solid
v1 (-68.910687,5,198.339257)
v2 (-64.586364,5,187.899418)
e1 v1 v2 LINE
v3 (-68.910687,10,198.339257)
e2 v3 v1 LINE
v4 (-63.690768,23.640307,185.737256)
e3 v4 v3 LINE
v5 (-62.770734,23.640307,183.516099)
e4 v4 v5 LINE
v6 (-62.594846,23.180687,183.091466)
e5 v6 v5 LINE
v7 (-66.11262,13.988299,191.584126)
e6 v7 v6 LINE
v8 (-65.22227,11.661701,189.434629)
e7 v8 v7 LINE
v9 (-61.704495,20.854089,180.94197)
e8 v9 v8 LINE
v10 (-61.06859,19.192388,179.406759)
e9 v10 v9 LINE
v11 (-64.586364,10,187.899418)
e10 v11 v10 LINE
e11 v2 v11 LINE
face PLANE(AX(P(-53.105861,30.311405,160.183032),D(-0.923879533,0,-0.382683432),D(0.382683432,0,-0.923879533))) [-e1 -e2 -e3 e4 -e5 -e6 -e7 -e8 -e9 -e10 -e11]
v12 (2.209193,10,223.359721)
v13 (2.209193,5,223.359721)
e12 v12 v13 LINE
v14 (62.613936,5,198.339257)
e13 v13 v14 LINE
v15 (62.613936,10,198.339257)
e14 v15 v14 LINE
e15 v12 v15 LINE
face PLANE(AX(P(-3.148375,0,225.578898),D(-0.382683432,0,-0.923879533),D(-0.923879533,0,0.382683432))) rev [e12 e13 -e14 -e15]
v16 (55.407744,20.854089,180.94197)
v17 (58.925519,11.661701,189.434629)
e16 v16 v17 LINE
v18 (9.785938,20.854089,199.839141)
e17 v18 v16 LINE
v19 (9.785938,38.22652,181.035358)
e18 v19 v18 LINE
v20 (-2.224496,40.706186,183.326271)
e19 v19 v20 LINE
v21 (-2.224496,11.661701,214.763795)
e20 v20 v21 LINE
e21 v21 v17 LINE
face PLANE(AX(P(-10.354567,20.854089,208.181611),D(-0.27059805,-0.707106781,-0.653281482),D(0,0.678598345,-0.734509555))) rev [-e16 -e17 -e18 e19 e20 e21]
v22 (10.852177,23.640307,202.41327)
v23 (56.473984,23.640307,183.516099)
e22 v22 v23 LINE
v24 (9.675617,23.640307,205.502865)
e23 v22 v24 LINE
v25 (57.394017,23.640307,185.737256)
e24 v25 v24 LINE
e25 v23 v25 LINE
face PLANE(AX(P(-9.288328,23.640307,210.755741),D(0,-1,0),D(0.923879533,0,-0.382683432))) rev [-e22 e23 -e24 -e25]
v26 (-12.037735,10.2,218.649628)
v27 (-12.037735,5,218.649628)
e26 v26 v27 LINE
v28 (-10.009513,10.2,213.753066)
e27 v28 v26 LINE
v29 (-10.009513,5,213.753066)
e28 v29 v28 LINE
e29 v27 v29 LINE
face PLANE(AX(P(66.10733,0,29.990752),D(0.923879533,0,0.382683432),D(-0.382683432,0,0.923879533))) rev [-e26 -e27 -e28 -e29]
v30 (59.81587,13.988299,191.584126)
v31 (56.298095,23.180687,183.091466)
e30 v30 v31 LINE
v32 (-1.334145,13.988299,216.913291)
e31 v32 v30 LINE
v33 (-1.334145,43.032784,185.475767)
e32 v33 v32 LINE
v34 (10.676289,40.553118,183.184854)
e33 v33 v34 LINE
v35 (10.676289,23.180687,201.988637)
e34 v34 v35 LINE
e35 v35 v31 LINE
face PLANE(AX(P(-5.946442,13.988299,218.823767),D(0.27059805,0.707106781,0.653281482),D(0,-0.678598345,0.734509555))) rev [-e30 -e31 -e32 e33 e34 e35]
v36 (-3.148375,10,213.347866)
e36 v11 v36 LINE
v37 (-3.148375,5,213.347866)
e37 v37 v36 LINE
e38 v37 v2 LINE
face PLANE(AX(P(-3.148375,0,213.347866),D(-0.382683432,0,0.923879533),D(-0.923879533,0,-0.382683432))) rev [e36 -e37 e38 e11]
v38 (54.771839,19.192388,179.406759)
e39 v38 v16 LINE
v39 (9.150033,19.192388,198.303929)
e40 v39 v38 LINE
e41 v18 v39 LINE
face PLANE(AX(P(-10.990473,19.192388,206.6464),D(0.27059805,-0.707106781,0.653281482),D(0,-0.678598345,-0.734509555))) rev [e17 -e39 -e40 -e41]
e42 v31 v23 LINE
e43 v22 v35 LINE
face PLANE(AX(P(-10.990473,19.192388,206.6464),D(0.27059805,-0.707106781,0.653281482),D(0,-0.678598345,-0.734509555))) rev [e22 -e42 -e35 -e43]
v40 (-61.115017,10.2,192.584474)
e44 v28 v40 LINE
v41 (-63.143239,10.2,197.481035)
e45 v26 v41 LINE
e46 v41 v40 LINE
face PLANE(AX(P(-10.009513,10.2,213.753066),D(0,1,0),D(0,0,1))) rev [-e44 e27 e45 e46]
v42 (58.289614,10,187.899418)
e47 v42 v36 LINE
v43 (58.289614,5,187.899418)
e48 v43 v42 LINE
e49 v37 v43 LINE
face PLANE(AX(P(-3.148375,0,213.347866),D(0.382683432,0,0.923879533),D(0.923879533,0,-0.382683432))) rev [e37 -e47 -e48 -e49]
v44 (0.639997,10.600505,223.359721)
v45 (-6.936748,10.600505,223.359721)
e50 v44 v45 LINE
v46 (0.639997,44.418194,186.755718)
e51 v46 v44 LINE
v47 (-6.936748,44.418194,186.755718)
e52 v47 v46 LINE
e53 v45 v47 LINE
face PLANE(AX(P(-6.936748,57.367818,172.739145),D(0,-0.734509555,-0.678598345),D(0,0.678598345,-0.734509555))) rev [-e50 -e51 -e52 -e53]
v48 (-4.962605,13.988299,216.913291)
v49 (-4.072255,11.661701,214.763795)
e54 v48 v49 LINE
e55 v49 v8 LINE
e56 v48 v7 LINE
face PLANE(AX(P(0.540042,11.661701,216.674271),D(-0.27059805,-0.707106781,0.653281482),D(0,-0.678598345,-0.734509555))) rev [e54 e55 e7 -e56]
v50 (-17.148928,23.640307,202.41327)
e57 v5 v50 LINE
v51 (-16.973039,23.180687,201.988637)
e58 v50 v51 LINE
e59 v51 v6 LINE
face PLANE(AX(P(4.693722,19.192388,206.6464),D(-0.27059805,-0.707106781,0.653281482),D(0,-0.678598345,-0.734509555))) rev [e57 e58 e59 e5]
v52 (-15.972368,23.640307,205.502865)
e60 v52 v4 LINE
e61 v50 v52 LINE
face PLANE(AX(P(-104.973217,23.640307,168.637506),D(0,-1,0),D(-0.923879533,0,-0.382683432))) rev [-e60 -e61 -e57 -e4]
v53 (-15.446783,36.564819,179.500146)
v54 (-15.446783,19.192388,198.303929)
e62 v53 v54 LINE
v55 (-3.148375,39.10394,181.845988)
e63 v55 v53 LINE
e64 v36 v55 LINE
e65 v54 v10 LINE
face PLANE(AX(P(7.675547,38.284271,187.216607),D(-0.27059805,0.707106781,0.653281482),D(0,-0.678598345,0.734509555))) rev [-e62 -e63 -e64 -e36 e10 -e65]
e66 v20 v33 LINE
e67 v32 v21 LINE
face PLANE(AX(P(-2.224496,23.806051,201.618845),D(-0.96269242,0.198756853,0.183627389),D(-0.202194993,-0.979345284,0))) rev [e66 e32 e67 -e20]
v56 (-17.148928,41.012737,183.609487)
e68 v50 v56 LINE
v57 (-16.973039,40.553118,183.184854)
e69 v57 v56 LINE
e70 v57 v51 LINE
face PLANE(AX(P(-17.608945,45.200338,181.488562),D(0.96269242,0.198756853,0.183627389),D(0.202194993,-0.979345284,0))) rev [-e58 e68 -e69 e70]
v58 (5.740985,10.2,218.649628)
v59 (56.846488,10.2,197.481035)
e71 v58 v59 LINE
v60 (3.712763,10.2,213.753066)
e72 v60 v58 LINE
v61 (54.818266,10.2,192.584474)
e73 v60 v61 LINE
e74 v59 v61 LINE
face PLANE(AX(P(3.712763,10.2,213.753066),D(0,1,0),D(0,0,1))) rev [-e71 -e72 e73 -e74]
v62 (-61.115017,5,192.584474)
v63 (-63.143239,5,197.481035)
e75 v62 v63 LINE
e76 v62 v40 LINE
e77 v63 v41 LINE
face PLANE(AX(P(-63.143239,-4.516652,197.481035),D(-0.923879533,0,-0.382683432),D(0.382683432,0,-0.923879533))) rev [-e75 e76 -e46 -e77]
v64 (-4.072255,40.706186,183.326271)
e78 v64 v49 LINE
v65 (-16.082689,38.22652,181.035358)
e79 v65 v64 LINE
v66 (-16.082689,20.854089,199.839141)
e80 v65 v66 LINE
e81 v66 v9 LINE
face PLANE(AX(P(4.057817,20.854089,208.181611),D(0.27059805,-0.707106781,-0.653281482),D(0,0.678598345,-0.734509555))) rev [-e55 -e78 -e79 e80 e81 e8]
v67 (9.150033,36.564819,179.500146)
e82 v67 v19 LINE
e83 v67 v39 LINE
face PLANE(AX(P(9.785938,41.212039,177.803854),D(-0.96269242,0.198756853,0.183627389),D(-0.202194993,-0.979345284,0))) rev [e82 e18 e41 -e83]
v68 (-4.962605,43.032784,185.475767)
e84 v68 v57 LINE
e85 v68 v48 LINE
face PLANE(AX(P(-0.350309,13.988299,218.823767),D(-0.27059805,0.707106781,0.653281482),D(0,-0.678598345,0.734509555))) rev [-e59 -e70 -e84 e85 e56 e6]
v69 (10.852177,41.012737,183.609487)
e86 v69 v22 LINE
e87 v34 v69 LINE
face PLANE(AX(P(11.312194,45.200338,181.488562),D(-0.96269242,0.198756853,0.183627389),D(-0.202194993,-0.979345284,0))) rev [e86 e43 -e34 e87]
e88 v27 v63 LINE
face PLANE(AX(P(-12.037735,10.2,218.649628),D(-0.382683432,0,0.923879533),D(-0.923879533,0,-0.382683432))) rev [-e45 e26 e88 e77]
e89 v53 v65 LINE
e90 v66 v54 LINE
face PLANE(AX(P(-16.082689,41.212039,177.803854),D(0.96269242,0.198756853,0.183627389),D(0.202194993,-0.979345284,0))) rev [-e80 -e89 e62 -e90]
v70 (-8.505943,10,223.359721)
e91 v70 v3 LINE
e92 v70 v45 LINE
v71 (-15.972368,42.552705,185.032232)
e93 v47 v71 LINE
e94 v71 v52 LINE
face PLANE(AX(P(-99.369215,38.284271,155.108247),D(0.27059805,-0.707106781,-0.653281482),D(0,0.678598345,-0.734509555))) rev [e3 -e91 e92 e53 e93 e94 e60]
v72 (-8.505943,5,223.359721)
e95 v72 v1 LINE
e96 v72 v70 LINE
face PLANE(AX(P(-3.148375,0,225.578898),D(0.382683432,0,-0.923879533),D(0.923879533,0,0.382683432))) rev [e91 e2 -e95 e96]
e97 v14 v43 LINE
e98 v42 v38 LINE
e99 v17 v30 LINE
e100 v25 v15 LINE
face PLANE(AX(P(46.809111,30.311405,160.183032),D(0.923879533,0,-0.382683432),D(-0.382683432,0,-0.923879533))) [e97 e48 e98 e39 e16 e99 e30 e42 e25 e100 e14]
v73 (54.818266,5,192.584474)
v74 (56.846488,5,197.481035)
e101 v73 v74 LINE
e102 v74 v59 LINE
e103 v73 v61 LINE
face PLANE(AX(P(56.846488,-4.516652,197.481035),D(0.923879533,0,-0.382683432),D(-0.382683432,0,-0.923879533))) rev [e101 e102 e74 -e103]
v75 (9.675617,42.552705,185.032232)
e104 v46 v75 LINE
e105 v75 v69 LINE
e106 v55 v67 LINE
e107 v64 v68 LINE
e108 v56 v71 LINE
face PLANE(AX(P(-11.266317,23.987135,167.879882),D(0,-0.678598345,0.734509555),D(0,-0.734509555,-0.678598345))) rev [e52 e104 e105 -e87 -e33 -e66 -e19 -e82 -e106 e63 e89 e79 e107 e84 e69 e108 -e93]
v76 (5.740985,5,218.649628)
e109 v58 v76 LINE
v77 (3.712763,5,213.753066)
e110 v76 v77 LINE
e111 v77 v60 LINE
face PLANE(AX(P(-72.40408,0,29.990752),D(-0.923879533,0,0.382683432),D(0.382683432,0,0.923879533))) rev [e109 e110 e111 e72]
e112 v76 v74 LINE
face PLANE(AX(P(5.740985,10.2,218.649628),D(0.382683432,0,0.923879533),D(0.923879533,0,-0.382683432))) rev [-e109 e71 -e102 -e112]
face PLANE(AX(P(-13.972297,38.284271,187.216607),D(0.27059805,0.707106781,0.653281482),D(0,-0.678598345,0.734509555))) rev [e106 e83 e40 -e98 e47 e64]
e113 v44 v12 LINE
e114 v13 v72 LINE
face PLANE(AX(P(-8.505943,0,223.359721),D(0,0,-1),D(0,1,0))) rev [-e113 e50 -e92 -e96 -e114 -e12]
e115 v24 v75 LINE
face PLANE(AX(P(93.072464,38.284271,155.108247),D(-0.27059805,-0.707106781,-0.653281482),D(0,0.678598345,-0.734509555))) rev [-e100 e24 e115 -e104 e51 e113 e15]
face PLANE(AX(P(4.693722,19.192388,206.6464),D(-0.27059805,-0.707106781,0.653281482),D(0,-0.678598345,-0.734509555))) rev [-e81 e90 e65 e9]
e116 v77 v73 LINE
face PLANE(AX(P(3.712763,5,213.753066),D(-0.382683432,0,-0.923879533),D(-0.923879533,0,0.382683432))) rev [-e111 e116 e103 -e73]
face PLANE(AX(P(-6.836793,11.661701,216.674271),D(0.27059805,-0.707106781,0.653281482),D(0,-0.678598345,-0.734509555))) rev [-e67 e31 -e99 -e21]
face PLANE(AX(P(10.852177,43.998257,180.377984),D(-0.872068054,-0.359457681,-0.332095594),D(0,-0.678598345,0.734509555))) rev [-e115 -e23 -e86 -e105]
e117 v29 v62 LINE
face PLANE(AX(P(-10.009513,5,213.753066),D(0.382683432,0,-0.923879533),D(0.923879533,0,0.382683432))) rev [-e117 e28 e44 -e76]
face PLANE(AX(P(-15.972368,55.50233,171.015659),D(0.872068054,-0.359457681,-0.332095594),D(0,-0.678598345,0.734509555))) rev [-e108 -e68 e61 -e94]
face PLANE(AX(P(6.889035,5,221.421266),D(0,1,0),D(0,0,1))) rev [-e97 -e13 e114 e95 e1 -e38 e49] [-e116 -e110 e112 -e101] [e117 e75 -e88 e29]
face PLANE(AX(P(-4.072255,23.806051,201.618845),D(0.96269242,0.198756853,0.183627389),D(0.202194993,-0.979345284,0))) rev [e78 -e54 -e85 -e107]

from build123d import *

# Parameters (mm, degrees)
SKETCH1_W                = 214.0895226738578
SKETCH1_H                = 271.0335668448457
BOSS_EXTRUDE1_DEPTH      = 10
SKETCH3_W                = 107.0447613369289
SKETCH3_H                = 271.0335668448457
CUT_EXTRUDE1_DEPTH       = 252.25359017903727
CUT_EXTRUDE2_DEPTH       = 249.55642867000518
BOSS_EXTRUDE3_DEPTH      = 40
CUT_EXTRUDE3_START       = -165.689856025
CUT_EXTRUDE3_DEPTH       = 205.862728092
CUT_EXTRUDE4_DEPTH       = 250.9605933606232
CUT_EXTRUDE5_DEPTH       = 250.96059336062322
BOSS_EXTRUDE5_DEPTH      = 45.000000000000014
CUT_EXTRUDE7_DEPTH       = 253.78419033582136
CUT_EXTRUDE9_DEPTH       = 253.78419033582136
CUT_EXTRUDE10_DEPTH      = 105
BOSS_EXTRUDE6_DEPTH      = 13.546139965279659
BOSS_EXTRUDE7_DEPTH      = 30
CUT_EXTRUDE12_DEPTH      = 30
CUT_EXTRUDE13_DEPTH      = 30
CUT_EXTRUDE14_DEPTH      = 30
CUT_EXTRUDE14_DEPTH_BACK = 101.66514829221025
BOSS_EXTRUDE8_DEPTH      = 5.2
CHAMFER1_START           = 223.359720619
CHAMFER1_OUTLINE_W       = 14
CHAMFER1_OUTLINE_H       = 9.000000000000002
CHAMFER1_DEPTH           = 3.640279381
CHAMFER3_START           = 159.35770891
CHAMFER3_OUTLINE_W       = 10
CHAMFER3_OUTLINE_H       = 51.999999999999986
CHAMFER3_DEPTH           = 1.64229109
CHAMFER4_SIZE            = 1.7


with BuildPart() as part:
    # Sketch1 → Boss-Extrude1 (new body)
    with BuildSketch(Plane(origin=(0, 0, 0), x_dir=(1, 0, 0), z_dir=(0, 1, 0))):
        with Locations((-3.148375333439077, -90.06211454589605)):
            Rectangle(SKETCH1_W, SKETCH1_H)
    extrude(amount=BOSS_EXTRUDE1_DEPTH)

    # Sketch3 → Cut-Extrude1 (cut, through all)
    with BuildSketch(Plane(origin=(0, 10, 0), x_dir=(1, 0, 0), z_dir=(0, 1, 0))):
        with Locations((-56.67075600190353, -90.06211454589605)):
            Rectangle(SKETCH3_W, SKETCH3_H)
    extrude(amount=-CUT_EXTRUDE1_DEPTH, mode=Mode.SUBTRACT)

    # Sketch4 → Cut-Extrude2 (cut, through all)
    with BuildSketch(Plane(origin=(0, 10, 0), x_dir=(1, 0, 0), z_dir=(0, 1, 0))):
        Polygon((103.89638600348982, -181.2395060415717), (100.8349185445691, -173.8484697814814), (9.99658424143476, 45.454668876526796), (103.89638600348982, 45.454668876526796), align=None)
    extrude(amount=-CUT_EXTRUDE2_DEPTH, mode=Mode.SUBTRACT)

    # Sketch6 → Boss-Extrude3 (add, along a direction that is not the sketch's normal)
    with BuildSketch(Plane(origin=(0, 10, 0), x_dir=(1, 0, 0), z_dir=(0, 1, 0))):
        Polygon((99.57206321776432, -170.7996673241942), (103.89638600348982, -181.2395060415717), (-3.148375333439077, -225.57889796831887), (-3.148375333439077, -213.34786610501484), align=None)
    extrude(amount=BOSS_EXTRUDE3_DEPTH, dir=(-0.2705980500730979, 0.7071067811865489, -0.6532814824381872))

    # Cut-Extrude3: read off the stored shape, not the designer's step
    # Cut-Extrude3 outline → Cut-Extrude3 (cut)
    with BuildSketch(Plane(origin=(0, 0, 0), x_dir=(1, 0, 0), z_dir=(0, 0.6785983445458481, -0.7345095552677544)).offset(CUT_EXTRUDE3_START)):
        Polygon((-3.148375333, -165), (-3.148375333, -152.122604304), (-13.972297336, -155.165042499), (-15, -155.45391393), (-15, -165), align=None)
    extrude(amount=CUT_EXTRUDE3_DEPTH, mode=Mode.SUBTRACT)

    # Sketch8 → Cut-Extrude4 (cut, through all)
    with BuildSketch(Plane(origin=(0, 10, 0), x_dir=(1, 0, 0), z_dir=(0, 1, 0))):
        Polygon((-3.1483753334390765, -225.5788979683189), (103.89638600348982, -181.2395060415717), (103.89638600348982, -225.57889796831887), align=None)
    extrude(amount=-CUT_EXTRUDE4_DEPTH, mode=Mode.SUBTRACT)

    # Sketch9 → Cut-Extrude5 (cut, through all)
    with BuildSketch(Plane(origin=(0, 10, 0), x_dir=(1, 0, 0), z_dir=(0, 1, 0))):
        Polygon((-3.1483753334390765, -213.34786610501484), (99.57206321776434, -170.7996673241942), (9.99658424143476, 45.454668876526796), (-3.148375333439077, 45.454668876526796), align=None)
    extrude(amount=-CUT_EXTRUDE5_DEPTH, mode=Mode.SUBTRACT)

    # Sketch13 → Boss-Extrude5 (add)
    with BuildSketch(Plane.XZ):
        Polygon((-3.1483753334390765, 225.5788979683189), (-3.1483753334390765, 213.34786610501484), (99.57206321776434, 170.7996673241942), (103.89638600348982, 181.23950604157167), align=None)
    extrude(amount=BOSS_EXTRUDE5_DEPTH)

    # Sketch14 → Cut-Extrude7 (cut, through all)
    with BuildSketch(Plane(origin=(24.60327067321852, 0, -10.191008391583336), x_dir=(-0.38268343236508967, 0, -0.9238795325112868), z_dir=(0.9238795325112867, 0, -0.3826834323650896))):
        Polygon((-178.9186244729457, 38.28427124746196), (-173.2686244729457, 32.63427124746195), (-167.6186244729457, 38.28427124746196), align=None)
    extrude(amount=-CUT_EXTRUDE7_DEPTH, mode=Mode.SUBTRACT)

    # Sketch21 → Cut-Extrude9 (cut, through all)
    with BuildSketch(Plane(origin=(24.60327067321852, 0, -10.191008391583336), x_dir=(-0.38268343236508967, 0, -0.9238795325112868), z_dir=(0.9238795325112867, 0, -0.3826834323650896))):
        Polygon((-178.9186244729457, 38.28427124746196), (-173.26862447294567, 32.63427124746195), (-186.71050756498246, 19.192388155425135), (-188.37220850077088, 20.854089091213513), (-197.564596656196, 11.661700935788378), (-199.8911947846192, 13.988299064211581), (-190.69880662919408, 23.180687219636717), (-192.3605075649825, 24.84238815542509), align=None)
    extrude(amount=-CUT_EXTRUDE9_DEPTH, mode=Mode.SUBTRACT)

    # Sketch26 → Cut-Extrude10 (cut)
    with BuildSketch(Plane(origin=(24.60327067321852, 0, -10.191008391583336), x_dir=(-0.38268343236508967, 0, -0.9238795325112868), z_dir=(0.9238795325112867, 0, -0.3826834323650896))):
        Polygon((-195.9028957204076, -45.000000000000014), (-207.2028957204075, -45.000000000000014), (-207.20289572040753, 4.999999999999999), (-204.20289572040753, 4.999999999999999), (-204.20289572040753, 10.2), (-198.9028957204076, 10.200000000000001), (-198.9028957204076, 5), (-195.9028957204076, 5), align=None)
    extrude(amount=-CUT_EXTRUDE10_DEPTH, mode=Mode.SUBTRACT)

    # Sketch27 → Boss-Extrude6 (add, along a direction that is not the sketch's normal)
    with BuildSketch(Plane(origin=(35.57097911044696, -92.95144786020374, 85.87594019533113), x_dir=(0.9626924198811571, 0.19875685341551327, -0.18362738881693624), z_dir=(-0.2705980500730966, 0.7071067811865525, -0.6532814824381838))):
        Polygon((-40.21986009681666, -165.94075499699434), (-39.260177114555994, -165.65967035927952), (-38.33532246822035, -168.81732163602243), (-40.219860096816646, -169.36928992803706), align=None)
    extrude(amount=BOSS_EXTRUDE6_DEPTH, dir=(0, 0.6785983445458494, -0.7345095552677533))

    # Sketch28 → Boss-Extrude7 (add, along a direction that is not the sketch's normal)
    with BuildSketch(Plane(origin=(32.05320445949652, -83.75905970477851, 77.38328092363429), x_dir=(0.9626924198811573, 0.1987568534155131, -0.18362738881693524), z_dir=(-0.27059805007309584, 0.7071067811865541, -0.6532814824381823))):
        Polygon((-23.13019805487444, -160.93530887309606), (-23.79074695350427, -158.6800538647835), (-36.56575980652385, -162.4217684996877), (-36.565759806523836, -170.74775403356227), (-21.544794509909032, -166.34821515815156), (-22.205343408538862, -164.09296014983897), (-34.68122217792752, -167.7470604401317), (-35.606076824263106, -164.58940916338878), align=None)
    extrude(amount=BOSS_EXTRUDE7_DEPTH, dir=(0, 0.6785983445458483, -0.7345095552677544))

    # Sketch29 → Cut-Extrude12 (cut)
    with BuildSketch(Plane(origin=(41.559974826961344, 108.60144786020382, 100.33465487913432), x_dir=(0.9626924198811563, -0.1987568534155138, -0.18362738881693985), z_dir=(0.2705980500730995, 0.7071067811865461, 0.6532814824381895))):
        Polygon((-46.44094960872295, -107.03174707988727), (-31.419984312108156, -107.03174707988727), (-31.41998431210815, -102.63220820447661), align=None)
    extrude(amount=-CUT_EXTRUDE12_DEPTH, mode=Mode.SUBTRACT)

    # Sketch30 → Cut-Extrude13 (cut)
    with BuildSketch(Plane(origin=(-72.40408024046648, 0, 29.990752006750984), x_dir=(-0.3826834323650857, 0, -0.9238795325112884), z_dir=(0.9238795325112884, 0, -0.3826834323650857))):
        Polygon((-207.20289572040787, 4.610357956966736), (-207.20289572040795, -45.000000000000014), (-195.90289572040788, -45.000000000000014), (-195.90289572040788, 4.6103579569667374), (-195.9028957204076, 5), (-207.20289572040755, 4.999999999999999), align=None)
    extrude(amount=-CUT_EXTRUDE13_DEPTH, mode=Mode.SUBTRACT)

    # Sketch31 → Cut-Extrude14 (cut, two sides: drawn at the far end of the back side and taken through both)
    with BuildSketch(Plane(origin=(74.968792544546, 0, 180.99067571577757), x_dir=(-0.9238795325112865, 0, 0.38268343236509056), z_dir=(-0.38268343236509056, 0, -0.9238795325112865)).offset(-CUT_EXTRUDE14_DEPTH_BACK)):
        Polygon((18.0534132200626, -1.4270293234233122), (-26.630388278374163, -1.4270293234233173), (-26.630388278374163, 30.311404517874507), (18.0534132200626, 30.311404517874507), align=None)
    extrude(amount=CUT_EXTRUDE14_DEPTH + CUT_EXTRUDE14_DEPTH_BACK, mode=Mode.SUBTRACT)

    # Sketch33 → Boss-Extrude8 (add)
    with BuildSketch(Plane(origin=(1.28e-15, 10.200000000000065, 3.08e-15), x_dir=(-1, 1.3e-16, 0), z_dir=(-1.3e-16, -1, -3e-16))):
        Polygon((-61.46588606719166, -195.56761797257994), (-56.84648840463523, -197.48103513440537), (-54.81826621310026, -192.5844736120956), (-59.437663875656696, -190.67105645027016), align=None)
    extrude(amount=BOSS_EXTRUDE8_DEPTH)

    # Mirror4: part across plane


with BuildPart() as part_1:
    add(part.part)
    add(part.part.mirror(Plane(origin=(-3.148375333439077, 0, 225.57889796831887), x_dir=(0, 0, 1), z_dir=(1, 0, 0))))

    # Chamfer1: read off the stored shape, not the designer's step
    # Chamfer1 outline → Chamfer1 (cut)
    with BuildSketch(Plane.XY.offset(CHAMFER1_START)):
        with Locations((-3, 9.5)):
            Rectangle(CHAMFER1_OUTLINE_W, CHAMFER1_OUTLINE_H)
    extrude(amount=CHAMFER1_DEPTH, mode=Mode.SUBTRACT)

    # Chamfer3: read off the stored shape, not the designer's step
    # Chamfer3 outline → Chamfer3 (cut)
    with BuildSketch(Plane(origin=(0, 0, 0), x_dir=(1, 0, 0), z_dir=(0, 0.7345095552677543, 0.6785983445458483)).offset(CHAMFER3_START)):
        with Locations((-3, -132)):
            Rectangle(CHAMFER3_OUTLINE_W, CHAMFER3_OUTLINE_H)
    extrude(amount=CHAMFER3_DEPTH, mode=Mode.SUBTRACT)

    # Chamfer4
    chamfer4_edges = [part_1.edges().sort_by_distance(p)[0] for p in [
        (34.12309720869192, 24.84238815542509, 194.07526337860742),
        (11.312194096909927, 33.52860342480338, 194.1219571598504),
        (-17.60894476378808, 33.52860342480338, 194.1219571598504),
        (-40.41984787557007, 24.84238815542509, 194.07526337860742),
    ]]
    chamfer(chamfer4_edges, length=CHAMFER4_SIZE)


solid = part_1.part
